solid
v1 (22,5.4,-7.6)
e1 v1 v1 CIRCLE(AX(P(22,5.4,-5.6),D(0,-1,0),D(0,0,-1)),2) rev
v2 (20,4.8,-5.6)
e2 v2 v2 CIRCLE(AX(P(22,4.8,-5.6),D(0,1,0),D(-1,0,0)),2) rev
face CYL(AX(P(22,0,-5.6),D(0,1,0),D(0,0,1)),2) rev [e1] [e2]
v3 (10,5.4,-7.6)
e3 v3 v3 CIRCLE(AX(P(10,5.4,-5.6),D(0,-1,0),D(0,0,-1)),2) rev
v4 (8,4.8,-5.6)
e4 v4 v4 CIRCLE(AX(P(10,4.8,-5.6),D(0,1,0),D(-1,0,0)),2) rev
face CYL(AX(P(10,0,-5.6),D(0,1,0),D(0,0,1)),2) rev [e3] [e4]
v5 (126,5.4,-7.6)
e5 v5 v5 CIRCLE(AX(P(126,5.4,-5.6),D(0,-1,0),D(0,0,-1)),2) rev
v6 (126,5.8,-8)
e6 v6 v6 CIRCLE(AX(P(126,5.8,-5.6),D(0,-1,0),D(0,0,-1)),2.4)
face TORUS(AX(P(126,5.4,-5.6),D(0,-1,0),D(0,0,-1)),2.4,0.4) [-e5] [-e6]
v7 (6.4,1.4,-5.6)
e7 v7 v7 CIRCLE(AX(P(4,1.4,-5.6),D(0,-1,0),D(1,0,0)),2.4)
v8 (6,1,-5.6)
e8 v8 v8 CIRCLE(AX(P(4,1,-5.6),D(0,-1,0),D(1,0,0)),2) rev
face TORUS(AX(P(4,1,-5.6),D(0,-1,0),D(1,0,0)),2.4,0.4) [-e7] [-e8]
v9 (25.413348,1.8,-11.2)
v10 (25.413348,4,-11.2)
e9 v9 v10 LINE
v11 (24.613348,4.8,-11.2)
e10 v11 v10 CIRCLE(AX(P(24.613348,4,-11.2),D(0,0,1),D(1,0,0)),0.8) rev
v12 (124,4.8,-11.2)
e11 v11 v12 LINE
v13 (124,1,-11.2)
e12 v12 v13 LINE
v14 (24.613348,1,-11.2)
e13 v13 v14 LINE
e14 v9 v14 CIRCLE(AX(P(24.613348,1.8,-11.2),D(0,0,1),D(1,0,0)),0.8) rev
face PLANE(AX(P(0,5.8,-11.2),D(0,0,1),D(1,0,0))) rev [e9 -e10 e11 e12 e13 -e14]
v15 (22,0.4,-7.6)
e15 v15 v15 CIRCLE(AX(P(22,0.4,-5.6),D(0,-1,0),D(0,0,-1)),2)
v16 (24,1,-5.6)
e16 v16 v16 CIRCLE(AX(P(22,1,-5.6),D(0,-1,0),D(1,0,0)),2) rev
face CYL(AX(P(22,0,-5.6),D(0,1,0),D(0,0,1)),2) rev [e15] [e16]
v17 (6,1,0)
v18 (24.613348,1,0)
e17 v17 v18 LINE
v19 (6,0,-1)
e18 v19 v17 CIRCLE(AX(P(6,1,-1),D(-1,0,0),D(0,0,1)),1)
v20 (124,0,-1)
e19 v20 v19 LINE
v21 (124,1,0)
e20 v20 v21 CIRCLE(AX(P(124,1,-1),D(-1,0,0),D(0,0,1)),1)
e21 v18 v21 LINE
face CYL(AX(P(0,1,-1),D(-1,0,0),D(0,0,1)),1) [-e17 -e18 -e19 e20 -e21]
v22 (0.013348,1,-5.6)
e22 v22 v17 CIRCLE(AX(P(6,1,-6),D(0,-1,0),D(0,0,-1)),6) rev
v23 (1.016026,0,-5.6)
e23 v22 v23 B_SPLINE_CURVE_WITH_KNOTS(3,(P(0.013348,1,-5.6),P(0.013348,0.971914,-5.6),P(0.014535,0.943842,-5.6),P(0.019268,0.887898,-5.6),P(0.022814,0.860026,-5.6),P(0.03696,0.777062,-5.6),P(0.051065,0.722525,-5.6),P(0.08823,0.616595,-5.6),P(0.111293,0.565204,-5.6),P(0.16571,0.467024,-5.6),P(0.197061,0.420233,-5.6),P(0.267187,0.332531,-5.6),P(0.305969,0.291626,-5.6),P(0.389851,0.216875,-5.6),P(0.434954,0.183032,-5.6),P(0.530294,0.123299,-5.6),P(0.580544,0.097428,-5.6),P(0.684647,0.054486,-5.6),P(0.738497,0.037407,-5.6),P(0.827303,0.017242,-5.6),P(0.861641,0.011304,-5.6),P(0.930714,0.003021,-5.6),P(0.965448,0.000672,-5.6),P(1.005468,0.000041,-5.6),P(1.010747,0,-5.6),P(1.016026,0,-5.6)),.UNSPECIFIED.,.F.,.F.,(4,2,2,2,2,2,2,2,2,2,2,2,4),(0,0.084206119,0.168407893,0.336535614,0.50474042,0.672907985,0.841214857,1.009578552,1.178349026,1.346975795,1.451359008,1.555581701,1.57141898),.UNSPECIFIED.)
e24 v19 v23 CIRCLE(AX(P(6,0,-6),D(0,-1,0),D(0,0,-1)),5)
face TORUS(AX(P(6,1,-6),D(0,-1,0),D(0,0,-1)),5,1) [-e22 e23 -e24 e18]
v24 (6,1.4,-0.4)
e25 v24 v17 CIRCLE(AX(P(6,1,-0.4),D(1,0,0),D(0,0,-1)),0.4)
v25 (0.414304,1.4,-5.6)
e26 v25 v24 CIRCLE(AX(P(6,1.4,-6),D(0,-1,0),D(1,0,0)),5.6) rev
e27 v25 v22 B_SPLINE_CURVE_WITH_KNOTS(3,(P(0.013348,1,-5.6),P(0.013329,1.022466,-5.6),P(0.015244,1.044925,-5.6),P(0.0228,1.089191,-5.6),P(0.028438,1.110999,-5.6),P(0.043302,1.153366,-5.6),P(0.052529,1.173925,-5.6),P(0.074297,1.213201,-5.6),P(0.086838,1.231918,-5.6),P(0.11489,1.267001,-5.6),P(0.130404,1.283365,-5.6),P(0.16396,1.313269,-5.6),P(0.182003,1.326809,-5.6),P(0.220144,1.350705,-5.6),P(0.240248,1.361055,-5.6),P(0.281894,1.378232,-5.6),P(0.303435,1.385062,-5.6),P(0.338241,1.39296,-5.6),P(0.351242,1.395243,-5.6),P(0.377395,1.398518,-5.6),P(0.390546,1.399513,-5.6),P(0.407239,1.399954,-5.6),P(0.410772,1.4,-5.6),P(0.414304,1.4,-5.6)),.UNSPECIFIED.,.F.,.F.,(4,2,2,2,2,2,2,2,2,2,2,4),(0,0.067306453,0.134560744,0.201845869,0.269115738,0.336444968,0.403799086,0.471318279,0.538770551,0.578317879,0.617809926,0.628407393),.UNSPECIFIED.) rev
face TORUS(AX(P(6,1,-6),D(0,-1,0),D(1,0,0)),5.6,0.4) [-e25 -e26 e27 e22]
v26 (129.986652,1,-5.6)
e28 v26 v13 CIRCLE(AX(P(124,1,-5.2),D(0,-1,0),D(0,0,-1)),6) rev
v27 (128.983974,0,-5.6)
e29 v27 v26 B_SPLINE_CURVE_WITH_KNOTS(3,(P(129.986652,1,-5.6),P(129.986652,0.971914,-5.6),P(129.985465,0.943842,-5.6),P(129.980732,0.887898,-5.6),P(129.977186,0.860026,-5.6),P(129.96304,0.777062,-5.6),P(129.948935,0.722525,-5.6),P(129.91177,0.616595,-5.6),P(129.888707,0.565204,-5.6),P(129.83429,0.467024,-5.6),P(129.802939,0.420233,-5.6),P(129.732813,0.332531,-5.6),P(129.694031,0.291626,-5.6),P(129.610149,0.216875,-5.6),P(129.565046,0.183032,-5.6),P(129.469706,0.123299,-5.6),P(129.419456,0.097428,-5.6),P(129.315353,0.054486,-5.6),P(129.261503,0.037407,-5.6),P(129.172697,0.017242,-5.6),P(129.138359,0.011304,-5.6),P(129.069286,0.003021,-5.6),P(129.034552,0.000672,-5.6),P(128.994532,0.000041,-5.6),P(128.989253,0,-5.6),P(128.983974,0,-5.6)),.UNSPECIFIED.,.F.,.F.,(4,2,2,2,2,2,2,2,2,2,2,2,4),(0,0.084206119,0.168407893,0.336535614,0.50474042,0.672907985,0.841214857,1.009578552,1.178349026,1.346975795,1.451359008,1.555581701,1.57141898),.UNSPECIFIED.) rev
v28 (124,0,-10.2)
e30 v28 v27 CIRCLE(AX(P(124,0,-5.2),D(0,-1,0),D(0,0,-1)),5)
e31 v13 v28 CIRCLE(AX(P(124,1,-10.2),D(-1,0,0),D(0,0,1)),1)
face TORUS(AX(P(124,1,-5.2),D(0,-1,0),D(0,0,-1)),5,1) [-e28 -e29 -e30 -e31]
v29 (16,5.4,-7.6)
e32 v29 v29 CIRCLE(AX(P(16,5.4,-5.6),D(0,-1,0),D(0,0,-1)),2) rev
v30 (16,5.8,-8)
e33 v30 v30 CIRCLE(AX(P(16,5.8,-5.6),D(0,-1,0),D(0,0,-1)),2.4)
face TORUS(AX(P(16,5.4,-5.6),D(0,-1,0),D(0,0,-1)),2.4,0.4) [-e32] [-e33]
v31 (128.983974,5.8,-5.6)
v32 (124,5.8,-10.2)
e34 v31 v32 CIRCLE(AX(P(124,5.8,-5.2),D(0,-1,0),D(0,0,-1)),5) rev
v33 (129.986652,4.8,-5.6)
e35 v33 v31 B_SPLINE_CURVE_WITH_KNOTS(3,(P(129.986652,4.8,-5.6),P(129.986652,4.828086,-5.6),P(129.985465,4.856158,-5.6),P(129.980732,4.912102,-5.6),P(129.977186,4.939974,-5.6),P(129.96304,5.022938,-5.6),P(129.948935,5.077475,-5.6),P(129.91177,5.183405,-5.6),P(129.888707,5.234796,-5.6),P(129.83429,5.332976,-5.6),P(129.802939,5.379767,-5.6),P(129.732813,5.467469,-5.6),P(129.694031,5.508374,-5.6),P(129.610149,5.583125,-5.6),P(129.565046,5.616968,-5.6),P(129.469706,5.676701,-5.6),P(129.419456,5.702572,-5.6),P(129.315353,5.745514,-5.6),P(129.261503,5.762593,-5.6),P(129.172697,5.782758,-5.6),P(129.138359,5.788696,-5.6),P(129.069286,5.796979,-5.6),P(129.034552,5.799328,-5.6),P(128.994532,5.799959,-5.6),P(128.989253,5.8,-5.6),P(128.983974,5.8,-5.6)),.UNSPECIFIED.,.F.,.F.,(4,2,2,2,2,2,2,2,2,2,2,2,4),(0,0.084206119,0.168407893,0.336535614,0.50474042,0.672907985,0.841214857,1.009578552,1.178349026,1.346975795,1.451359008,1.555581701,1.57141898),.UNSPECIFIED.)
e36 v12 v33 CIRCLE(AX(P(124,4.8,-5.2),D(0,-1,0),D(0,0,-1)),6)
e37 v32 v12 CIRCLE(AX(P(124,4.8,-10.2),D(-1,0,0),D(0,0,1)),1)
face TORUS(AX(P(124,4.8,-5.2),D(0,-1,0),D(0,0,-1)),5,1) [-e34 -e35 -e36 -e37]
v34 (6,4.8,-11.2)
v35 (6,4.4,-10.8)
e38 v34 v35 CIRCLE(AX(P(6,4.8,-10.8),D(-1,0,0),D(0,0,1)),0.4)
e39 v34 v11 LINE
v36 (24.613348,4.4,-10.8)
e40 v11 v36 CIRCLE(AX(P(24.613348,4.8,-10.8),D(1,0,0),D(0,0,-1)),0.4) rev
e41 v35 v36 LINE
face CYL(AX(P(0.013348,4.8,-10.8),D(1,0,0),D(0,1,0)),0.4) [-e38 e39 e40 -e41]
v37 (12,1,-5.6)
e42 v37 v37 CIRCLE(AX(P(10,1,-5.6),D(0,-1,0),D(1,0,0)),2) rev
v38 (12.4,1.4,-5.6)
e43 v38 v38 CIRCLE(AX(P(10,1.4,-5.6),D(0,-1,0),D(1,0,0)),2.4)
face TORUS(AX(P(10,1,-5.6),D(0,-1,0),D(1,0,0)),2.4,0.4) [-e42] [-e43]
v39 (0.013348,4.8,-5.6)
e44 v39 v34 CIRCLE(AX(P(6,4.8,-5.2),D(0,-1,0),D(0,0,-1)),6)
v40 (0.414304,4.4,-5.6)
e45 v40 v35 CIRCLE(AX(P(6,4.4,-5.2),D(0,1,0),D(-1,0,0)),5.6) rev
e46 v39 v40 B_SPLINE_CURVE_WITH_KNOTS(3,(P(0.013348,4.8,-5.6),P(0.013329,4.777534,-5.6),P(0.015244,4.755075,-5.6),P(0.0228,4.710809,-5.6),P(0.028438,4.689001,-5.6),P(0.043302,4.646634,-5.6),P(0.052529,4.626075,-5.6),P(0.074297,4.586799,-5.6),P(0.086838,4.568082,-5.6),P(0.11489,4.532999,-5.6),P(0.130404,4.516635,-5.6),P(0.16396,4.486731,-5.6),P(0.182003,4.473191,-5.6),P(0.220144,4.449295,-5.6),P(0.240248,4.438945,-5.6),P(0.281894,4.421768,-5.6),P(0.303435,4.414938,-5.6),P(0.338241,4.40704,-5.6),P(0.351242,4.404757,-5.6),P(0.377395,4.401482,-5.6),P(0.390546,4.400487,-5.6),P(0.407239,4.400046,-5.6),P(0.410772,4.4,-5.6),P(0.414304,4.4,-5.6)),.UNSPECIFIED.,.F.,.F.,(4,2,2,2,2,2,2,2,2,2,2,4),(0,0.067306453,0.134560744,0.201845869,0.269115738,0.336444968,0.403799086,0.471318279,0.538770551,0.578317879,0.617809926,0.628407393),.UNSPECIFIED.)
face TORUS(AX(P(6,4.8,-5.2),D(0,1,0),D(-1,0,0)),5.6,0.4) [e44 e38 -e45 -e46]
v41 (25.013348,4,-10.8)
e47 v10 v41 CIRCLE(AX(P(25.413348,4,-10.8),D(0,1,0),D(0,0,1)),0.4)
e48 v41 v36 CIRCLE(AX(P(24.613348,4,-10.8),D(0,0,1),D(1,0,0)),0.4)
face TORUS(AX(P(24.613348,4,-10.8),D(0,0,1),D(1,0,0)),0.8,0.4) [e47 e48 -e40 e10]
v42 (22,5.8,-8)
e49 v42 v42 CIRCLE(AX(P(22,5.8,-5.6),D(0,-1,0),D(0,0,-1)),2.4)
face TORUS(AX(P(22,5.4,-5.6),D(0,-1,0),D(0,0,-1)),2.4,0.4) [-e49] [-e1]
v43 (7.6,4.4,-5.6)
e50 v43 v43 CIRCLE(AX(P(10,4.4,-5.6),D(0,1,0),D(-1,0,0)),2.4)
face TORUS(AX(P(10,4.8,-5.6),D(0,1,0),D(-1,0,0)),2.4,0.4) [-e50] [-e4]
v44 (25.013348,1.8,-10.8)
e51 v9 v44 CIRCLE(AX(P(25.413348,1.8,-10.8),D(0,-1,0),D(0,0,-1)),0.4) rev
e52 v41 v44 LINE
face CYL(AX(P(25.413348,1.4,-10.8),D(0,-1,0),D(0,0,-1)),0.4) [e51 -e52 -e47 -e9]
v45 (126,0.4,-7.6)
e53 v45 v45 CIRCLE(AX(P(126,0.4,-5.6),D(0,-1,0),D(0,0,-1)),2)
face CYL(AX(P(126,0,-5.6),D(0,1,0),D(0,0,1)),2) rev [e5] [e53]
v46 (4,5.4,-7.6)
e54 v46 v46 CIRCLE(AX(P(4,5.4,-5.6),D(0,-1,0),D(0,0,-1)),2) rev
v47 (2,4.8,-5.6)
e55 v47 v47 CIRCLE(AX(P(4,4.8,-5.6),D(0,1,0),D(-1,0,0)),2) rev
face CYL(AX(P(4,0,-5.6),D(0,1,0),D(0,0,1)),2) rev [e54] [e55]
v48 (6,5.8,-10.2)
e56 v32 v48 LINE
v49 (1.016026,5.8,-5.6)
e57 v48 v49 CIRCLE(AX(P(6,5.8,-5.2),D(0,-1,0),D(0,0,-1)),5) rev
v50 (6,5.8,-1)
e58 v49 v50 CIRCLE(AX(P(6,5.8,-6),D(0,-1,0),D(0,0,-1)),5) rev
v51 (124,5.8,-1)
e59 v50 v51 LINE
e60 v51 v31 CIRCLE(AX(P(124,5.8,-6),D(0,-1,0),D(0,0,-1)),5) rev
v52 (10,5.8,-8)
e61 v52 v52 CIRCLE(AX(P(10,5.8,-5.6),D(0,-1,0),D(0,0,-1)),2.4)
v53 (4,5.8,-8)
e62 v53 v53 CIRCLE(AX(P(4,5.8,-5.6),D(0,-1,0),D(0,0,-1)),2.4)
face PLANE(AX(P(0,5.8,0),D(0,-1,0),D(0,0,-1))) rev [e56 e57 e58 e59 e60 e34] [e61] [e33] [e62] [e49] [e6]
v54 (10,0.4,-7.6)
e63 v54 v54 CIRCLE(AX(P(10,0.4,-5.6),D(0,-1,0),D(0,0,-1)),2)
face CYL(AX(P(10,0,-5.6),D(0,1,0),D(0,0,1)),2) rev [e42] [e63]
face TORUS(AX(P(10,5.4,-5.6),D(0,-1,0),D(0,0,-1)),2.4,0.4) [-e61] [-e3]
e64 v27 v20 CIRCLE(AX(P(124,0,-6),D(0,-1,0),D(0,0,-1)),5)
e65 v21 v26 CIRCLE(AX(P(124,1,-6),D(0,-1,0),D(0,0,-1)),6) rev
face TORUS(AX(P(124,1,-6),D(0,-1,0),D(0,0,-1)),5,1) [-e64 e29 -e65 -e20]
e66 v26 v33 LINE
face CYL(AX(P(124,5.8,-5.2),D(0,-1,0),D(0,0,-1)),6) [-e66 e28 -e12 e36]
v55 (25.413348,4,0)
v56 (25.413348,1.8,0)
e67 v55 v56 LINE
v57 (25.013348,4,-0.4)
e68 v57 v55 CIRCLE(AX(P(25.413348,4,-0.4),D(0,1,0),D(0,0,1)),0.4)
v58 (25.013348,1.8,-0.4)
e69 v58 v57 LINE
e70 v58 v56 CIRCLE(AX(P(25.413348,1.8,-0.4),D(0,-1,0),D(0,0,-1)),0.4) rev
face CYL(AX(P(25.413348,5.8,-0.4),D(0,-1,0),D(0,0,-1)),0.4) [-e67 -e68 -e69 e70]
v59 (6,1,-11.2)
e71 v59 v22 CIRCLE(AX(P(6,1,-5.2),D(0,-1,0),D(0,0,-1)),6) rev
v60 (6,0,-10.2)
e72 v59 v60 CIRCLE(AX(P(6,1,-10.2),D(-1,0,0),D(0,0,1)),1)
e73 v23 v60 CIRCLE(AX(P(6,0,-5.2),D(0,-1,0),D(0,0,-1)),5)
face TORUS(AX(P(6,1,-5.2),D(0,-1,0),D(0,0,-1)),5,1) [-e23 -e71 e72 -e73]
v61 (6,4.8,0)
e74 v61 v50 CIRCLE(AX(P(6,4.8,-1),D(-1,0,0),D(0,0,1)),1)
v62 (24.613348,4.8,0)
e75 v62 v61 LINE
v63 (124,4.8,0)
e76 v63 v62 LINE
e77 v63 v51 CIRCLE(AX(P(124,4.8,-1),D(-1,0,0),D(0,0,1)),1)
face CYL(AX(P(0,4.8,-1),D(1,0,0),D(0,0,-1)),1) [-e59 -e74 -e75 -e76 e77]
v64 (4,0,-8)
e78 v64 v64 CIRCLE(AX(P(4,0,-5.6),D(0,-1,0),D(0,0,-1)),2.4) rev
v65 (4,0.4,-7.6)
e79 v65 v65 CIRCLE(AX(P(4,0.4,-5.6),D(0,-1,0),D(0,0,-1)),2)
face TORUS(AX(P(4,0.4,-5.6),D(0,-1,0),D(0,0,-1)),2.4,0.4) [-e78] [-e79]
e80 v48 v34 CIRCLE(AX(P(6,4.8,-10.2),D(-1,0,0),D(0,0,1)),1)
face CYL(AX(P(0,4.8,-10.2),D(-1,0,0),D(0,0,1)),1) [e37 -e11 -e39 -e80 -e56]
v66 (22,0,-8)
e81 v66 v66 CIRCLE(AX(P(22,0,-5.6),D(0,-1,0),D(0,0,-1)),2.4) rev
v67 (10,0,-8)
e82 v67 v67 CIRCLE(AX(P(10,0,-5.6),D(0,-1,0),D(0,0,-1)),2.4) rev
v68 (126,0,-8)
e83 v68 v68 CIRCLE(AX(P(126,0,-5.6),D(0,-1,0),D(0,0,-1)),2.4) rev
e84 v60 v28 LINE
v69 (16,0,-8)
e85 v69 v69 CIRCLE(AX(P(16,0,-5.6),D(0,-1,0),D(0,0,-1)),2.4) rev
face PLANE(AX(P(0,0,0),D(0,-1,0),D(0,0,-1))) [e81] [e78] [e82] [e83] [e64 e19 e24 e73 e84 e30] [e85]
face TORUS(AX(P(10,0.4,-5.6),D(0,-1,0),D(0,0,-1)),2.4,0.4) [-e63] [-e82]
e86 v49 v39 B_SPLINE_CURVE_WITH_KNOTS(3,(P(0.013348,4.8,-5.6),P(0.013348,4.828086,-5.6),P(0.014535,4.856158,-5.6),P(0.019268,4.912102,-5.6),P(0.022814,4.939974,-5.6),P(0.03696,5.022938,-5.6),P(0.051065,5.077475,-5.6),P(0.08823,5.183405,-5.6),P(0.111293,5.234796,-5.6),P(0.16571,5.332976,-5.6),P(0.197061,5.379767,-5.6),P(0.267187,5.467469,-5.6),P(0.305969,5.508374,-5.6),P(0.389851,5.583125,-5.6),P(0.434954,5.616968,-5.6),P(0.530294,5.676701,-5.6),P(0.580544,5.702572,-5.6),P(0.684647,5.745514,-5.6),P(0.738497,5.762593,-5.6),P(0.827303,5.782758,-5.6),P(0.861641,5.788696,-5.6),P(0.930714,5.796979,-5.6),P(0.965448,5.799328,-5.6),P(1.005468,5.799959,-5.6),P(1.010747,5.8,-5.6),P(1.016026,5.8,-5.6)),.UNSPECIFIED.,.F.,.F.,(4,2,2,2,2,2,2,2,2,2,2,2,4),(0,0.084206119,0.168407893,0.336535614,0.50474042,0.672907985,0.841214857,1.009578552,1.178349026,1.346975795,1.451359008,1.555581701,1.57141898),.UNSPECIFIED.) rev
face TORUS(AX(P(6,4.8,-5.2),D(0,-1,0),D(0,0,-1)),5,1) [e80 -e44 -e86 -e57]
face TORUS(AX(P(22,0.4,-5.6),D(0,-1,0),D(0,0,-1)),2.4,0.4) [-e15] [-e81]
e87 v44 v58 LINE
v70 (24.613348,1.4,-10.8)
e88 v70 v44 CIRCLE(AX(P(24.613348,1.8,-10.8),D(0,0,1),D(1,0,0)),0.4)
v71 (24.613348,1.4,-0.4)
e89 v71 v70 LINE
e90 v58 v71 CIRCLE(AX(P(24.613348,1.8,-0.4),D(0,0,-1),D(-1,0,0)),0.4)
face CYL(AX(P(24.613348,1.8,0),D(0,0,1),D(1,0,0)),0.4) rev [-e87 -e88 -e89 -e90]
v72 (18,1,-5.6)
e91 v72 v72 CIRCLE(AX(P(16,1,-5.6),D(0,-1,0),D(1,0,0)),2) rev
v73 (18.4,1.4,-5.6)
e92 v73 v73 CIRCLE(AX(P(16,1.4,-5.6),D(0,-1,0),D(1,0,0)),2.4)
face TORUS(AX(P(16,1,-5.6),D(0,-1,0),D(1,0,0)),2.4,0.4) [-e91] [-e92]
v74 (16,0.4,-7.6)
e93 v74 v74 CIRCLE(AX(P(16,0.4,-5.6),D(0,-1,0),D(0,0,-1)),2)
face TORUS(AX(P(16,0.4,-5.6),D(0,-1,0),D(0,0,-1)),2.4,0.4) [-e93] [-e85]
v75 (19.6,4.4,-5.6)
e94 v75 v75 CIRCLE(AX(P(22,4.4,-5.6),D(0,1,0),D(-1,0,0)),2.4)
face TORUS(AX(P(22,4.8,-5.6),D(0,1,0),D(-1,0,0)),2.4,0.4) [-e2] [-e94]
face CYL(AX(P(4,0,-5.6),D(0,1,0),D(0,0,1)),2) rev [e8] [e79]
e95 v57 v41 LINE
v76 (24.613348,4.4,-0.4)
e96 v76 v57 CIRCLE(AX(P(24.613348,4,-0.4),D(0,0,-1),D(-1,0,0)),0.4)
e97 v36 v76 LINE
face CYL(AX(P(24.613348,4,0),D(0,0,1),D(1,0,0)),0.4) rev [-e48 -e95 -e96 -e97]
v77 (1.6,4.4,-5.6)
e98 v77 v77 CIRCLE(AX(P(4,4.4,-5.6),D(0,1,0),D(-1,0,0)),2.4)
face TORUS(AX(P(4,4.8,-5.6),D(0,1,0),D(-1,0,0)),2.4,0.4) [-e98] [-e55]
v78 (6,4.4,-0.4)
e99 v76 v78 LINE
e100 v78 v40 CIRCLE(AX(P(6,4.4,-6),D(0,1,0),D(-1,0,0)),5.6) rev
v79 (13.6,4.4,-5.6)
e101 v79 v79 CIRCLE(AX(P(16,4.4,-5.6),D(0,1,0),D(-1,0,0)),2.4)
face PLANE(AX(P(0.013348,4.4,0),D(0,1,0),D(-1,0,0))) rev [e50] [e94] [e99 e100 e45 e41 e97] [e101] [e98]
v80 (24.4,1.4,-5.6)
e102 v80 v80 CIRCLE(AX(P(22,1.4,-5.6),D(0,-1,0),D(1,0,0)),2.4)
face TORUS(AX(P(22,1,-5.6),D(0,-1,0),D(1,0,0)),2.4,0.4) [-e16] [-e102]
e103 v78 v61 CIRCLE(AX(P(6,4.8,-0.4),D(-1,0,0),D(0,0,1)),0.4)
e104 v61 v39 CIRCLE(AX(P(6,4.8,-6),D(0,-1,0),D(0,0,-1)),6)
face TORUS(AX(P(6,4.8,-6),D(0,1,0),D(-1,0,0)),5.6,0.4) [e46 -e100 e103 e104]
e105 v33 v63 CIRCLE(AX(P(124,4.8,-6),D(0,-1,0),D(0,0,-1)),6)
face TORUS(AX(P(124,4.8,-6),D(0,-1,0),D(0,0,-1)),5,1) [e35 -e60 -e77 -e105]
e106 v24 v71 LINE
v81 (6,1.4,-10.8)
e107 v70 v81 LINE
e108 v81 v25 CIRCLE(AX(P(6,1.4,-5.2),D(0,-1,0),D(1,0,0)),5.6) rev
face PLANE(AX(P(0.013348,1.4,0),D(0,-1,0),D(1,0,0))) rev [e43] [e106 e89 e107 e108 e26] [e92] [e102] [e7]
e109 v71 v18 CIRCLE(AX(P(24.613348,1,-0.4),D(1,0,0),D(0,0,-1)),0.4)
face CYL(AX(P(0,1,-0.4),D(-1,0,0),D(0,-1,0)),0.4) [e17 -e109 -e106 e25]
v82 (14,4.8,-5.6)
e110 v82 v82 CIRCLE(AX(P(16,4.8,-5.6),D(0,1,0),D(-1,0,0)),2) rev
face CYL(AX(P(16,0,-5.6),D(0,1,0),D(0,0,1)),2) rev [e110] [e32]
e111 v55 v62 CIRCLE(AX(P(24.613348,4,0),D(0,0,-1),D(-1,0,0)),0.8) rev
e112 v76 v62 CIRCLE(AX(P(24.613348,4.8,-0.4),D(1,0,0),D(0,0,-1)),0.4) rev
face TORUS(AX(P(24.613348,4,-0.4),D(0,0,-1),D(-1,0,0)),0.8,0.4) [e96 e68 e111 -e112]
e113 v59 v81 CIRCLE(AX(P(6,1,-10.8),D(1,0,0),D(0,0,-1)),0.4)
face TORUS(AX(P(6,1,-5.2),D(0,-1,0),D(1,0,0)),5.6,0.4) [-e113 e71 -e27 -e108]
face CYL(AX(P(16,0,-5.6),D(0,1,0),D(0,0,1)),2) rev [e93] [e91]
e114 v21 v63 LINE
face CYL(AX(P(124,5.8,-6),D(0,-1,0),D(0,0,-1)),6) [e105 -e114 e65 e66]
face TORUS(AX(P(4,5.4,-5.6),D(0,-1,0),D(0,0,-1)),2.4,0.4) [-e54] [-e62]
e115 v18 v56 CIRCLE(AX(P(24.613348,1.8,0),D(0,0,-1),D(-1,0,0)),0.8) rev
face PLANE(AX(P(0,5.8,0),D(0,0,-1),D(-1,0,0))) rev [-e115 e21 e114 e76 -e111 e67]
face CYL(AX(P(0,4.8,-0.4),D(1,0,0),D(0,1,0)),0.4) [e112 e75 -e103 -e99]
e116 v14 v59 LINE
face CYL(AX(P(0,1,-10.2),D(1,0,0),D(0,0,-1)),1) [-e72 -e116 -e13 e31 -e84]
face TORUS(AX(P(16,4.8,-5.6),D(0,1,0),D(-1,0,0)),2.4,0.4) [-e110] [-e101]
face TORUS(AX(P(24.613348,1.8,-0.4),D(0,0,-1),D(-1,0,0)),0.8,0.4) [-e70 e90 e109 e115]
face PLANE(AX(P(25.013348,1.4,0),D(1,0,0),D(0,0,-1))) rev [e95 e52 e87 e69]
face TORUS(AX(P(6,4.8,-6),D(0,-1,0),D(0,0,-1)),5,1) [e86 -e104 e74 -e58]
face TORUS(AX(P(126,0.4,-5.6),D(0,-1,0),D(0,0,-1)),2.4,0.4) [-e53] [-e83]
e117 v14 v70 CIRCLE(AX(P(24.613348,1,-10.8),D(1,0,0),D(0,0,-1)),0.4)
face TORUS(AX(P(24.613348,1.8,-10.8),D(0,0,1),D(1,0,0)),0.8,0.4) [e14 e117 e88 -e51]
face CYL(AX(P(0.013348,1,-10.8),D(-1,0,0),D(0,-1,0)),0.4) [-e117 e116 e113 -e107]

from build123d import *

# Parameters (mm, degrees)
SKETCH1_W           = 130
SKETCH1_H           = 11.2
BOSS_EXTRUDE1_DEPTH = 5.8
SKETCH2_R           = 2
CUT_EXTRUDE1_DEPTH  = 131.610413061
FILLET1_R           = 6
FILLET2_R           = 1
SKETCH3_W           = 25
SKETCH3_H           = 3
CUT_EXTRUDE2_DEPTH  = 131.597127382
FILLET3_R           = 0.4


with BuildPart() as part:
    # Sketch1 → Boss-Extrude1 (new body)
    with BuildSketch(Plane(origin=(0, 0, 0), x_dir=(1, 0, 0), z_dir=(0, 1, 0))):
        with Locations((65, 5.6)):
            Rectangle(SKETCH1_W, SKETCH1_H)
    extrude(amount=BOSS_EXTRUDE1_DEPTH)

    # Sketch2 → Cut-Extrude1 (cut, through all)
    with BuildSketch(Plane(origin=(0, 5.8, 0), x_dir=(1, 0, 0), z_dir=(0, 1, 0))):
        with Locations(Location((4, 5.6, 0), (0, 0, 270))):
            Circle(SKETCH2_R)
        with Locations(Location((126, 5.6, 0), (0, 0, 270))):
            Circle(SKETCH2_R)
        with Locations(Location((10, 5.6, 0), (0, 0, 270))):
            Circle(SKETCH2_R)
        with Locations(Location((16, 5.6, 0), (0, 0, 270))):
            Circle(SKETCH2_R)
        with Locations(Location((22, 5.6, 0), (0, 0, 270))):
            Circle(SKETCH2_R)
    extrude(amount=-CUT_EXTRUDE1_DEPTH, mode=Mode.SUBTRACT)

    # Fillet1
    # the kernel refuses this fillet: 6 mm, written as the material it takes off along each edge
    with BuildSketch(Plane(origin=(130, -15, 0), x_dir=(-1, 0, 0), z_dir=(0, 1, 0)), Plane(origin=(130, -15, -11.2), x_dir=(0, 0, 1), z_dir=(0, 1, 0))) as fillet1_piece_1:
        with BuildLine():
            CenterArc((FILLET1_R, -FILLET1_R), FILLET1_R, 90, 90)
            Line((0, -FILLET1_R), (0, 0))
            Line((0, 0), (FILLET1_R, 0))
        make_face()
    extrude(amount=35.8, mode=Mode.SUBTRACT)
    with BuildSketch(Plane(origin=(0, -15, -11.2), x_dir=(0, 0, 1), z_dir=(0, 1, 0)), Plane(origin=(0, -15, 0), x_dir=(1, 0, 0), z_dir=(0, 1, 0))) as fillet1_piece_2:
        with BuildLine():
            CenterArc((FILLET1_R, FILLET1_R), FILLET1_R, 180, 90)
            Line((0, FILLET1_R), (0, 0))
            Line((0, 0), (FILLET1_R, 0))
        make_face()
    extrude(amount=35.8, mode=Mode.SUBTRACT)

    # Fillet2
    # the kernel refuses this fillet: 1 mm, written as the material it takes off along each edge
    with BuildSketch(Plane(origin=(124, 0, -11.2), x_dir=(0, 0, 1), z_dir=(-1, 0, 0)), Plane(origin=(6, 5.8, 0), x_dir=(0, -1, 0), z_dir=(1, 0, 0))) as fillet2_piece_1:
        with BuildLine():
            CenterArc((FILLET2_R, FILLET2_R), FILLET2_R, 180, 90)
            Line((0, FILLET2_R), (0, 0))
            Line((0, 0), (FILLET2_R, 0))
        make_face()
    extrude(amount=118, mode=Mode.SUBTRACT)
    with BuildSketch(Plane(origin=(6, 0, 0), x_dir=(0, 1, 0), z_dir=(1, 0, 0)), Plane(origin=(124, 5.8, -11.2), x_dir=(0, 0, 1), z_dir=(-1, 0, 0))) as fillet2_piece_2:
        with BuildLine():
            CenterArc((FILLET2_R, -FILLET2_R), FILLET2_R, 90, 90)
            Line((0, -FILLET2_R), (0, 0))
            Line((0, 0), (FILLET2_R, 0))
        make_face()
    extrude(amount=118, mode=Mode.SUBTRACT)
    with BuildSketch(Plane(origin=(124, 0, -5.2), x_dir=(0, 0, -1), z_dir=(-1, 0, 0))) as fillet2_piece_3:
        with BuildLine():
            CenterArc((6 - FILLET2_R, -FILLET2_R), FILLET2_R, 0, 90)
            Line((6, -FILLET2_R), (6, 0))
            Line((6, 0), (6 - FILLET2_R, 0))
        make_face()
    revolve(axis=Axis((124, 0, -5.2), (0, -1, 0)), revolution_arc=110.05948027, mode=Mode.SUBTRACT)
    with BuildSketch(Plane(origin=(124, 0, -6), x_dir=(0.9393370543039211, 0, -0.3429954787043592), z_dir=(-0.3429954787043592, 0, -0.9393370543039211))) as fillet2_piece_4:
        with BuildLine():
            CenterArc((6 - FILLET2_R, -FILLET2_R), FILLET2_R, 0, 90)
            Line((6, -FILLET2_R), (6, 0))
            Line((6, 0), (6 - FILLET2_R, 0))
        make_face()
    revolve(axis=Axis((124, 0, -6), (0, -1, 0)), revolution_arc=110.05948027, mode=Mode.SUBTRACT)
    with BuildSketch(Plane(origin=(6, 0, -6), x_dir=(0, 0, 1), z_dir=(1, 0, 0))) as fillet2_piece_5:
        with BuildLine():
            CenterArc((6 - FILLET2_R, -FILLET2_R), FILLET2_R, 0, 90)
            Line((6, -FILLET2_R), (6, 0))
            Line((6, 0), (6 - FILLET2_R, 0))
        make_face()
    revolve(axis=Axis((6, 0, -6), (0, -1, 0)), revolution_arc=110.05948027, mode=Mode.SUBTRACT)
    with BuildSketch(Plane(origin=(6, 0, -5.2), x_dir=(-0.9393370543039198, 0, 0.3429954787043625), z_dir=(0.3429954787043625, 0, 0.9393370543039198))) as fillet2_piece_6:
        with BuildLine():
            CenterArc((6 - FILLET2_R, -FILLET2_R), FILLET2_R, 0, 90)
            Line((6, -FILLET2_R), (6, 0))
            Line((6, 0), (6 - FILLET2_R, 0))
        make_face()
    revolve(axis=Axis((6, 0, -5.2), (0, -1, 0)), revolution_arc=110.05948027, mode=Mode.SUBTRACT)
    with BuildSketch(Plane(origin=(124, 5.8, -5.2), x_dir=(0, 0, -1), z_dir=(-1, 0, 0))) as fillet2_piece_7:
        with BuildLine():
            CenterArc((6 - FILLET2_R, FILLET2_R), FILLET2_R, 270, 90)
            Line((6, FILLET2_R), (6, 0))
            Line((6, 0), (6 - FILLET2_R, 0))
        make_face()
    revolve(axis=Axis((124, 5.8, -5.2), (0, -1, 0)), revolution_arc=110.05948027, mode=Mode.SUBTRACT)
    with BuildSketch(Plane(origin=(124, 5.8, -6), x_dir=(0.9393370543039211, 0, -0.3429954787043592), z_dir=(-0.3429954787043592, 0, -0.9393370543039211))) as fillet2_piece_8:
        with BuildLine():
            CenterArc((6 - FILLET2_R, FILLET2_R), FILLET2_R, 270, 90)
            Line((6 - FILLET2_R, 0), (6, 0))
            Line((6, 0), (6, FILLET2_R))
        make_face()
    revolve(axis=Axis((124, 5.8, -6), (0, -1, 0)), revolution_arc=110.05948027, mode=Mode.SUBTRACT)
    with BuildSketch(Plane(origin=(6, 5.8, -6), x_dir=(0, 0, 1), z_dir=(1, 0, 0))) as fillet2_piece_9:
        with BuildLine():
            CenterArc((6 - FILLET2_R, FILLET2_R), FILLET2_R, 270, 90)
            Line((6, FILLET2_R), (6, 0))
            Line((6, 0), (6 - FILLET2_R, 0))
        make_face()
    revolve(axis=Axis((6, 5.8, -6), (0, -1, 0)), revolution_arc=110.05948027, mode=Mode.SUBTRACT)
    with BuildSketch(Plane(origin=(6, 5.8, -5.2), x_dir=(-0.9393370543039198, 0, 0.3429954787043625), z_dir=(0.3429954787043625, 0, 0.9393370543039198))) as fillet2_piece_10:
        with BuildLine():
            CenterArc((6 - FILLET2_R, FILLET2_R), FILLET2_R, 270, 90)
            Line((6, FILLET2_R), (6, 0))
            Line((6, 0), (6 - FILLET2_R, 0))
        make_face()
    revolve(axis=Axis((6, 5.8, -5.2), (0, -1, 0)), revolution_arc=110.05948027, mode=Mode.SUBTRACT)

    # Sketch3 → Cut-Extrude2 (cut, through all)
    with BuildSketch(Plane(origin=(0, 0, -11.2), x_dir=(-1, 0, 0), z_dir=(0, 0, -1))):
        with Locations((-12.513348181, 2.9)):
            Rectangle(SKETCH3_W, SKETCH3_H)
    extrude(amount=-CUT_EXTRUDE2_DEPTH, mode=Mode.SUBTRACT)

    # Fillet3
    # the kernel refuses this fillet: 0.4 mm, written as the material it adds along each edge
    with BuildSketch(Plane(origin=(25.013348181, 4.4, -11.2), x_dir=(-1, 0, 0), z_dir=(0, 0, 1)), Plane(origin=(25.013348181, 1.4, -11.2), x_dir=(0, 1, 0), z_dir=(0, 0, 1))) as fillet3_piece_1:
        with BuildLine():
            CenterArc((FILLET3_R, FILLET3_R), FILLET3_R, 180, 90)
            Line((0, FILLET3_R), (0, 0))
            Line((0, 0), (FILLET3_R, 0))
        make_face()
    extrude(amount=11.2)
    # the kernel refuses this fillet: 0.4 mm, written as the material it takes off along each edge
    with BuildSketch(Plane(origin=(126, 5.8, -5.6), x_dir=(0, 0, 1), z_dir=(-1, 0, 0))) as fillet3_2_piece_1:
        with BuildLine():
            CenterArc((2 + FILLET3_R, -FILLET3_R), FILLET3_R, 90, 90)
            Line((2, -FILLET3_R), (2, 0))
            Line((2, 0), (2 + FILLET3_R, 0))
        make_face()
    revolve(axis=Axis((126, 5.8, -5.6), (0, 1, 0)), mode=Mode.SUBTRACT)
    with BuildSketch(Plane(origin=(126, 0, -5.6), x_dir=(0, 0, 1), z_dir=(-1, 0, 0))) as fillet3_2_piece_2:
        with BuildLine():
            CenterArc((2 + FILLET3_R, FILLET3_R), FILLET3_R, 180, 90)
            Line((2, FILLET3_R), (2, 0))
            Line((2, 0), (2 + FILLET3_R, 0))
        make_face()
    revolve(axis=Axis((126, 0, -5.6), (0, 1, 0)), mode=Mode.SUBTRACT)
    with BuildSketch(Plane(origin=(4, 5.8, -5.6), x_dir=(0, 0, 1), z_dir=(-1, 0, 0))) as fillet3_2_piece_3:
        with BuildLine():
            CenterArc((2 + FILLET3_R, -FILLET3_R), FILLET3_R, 90, 90)
            Line((2, -FILLET3_R), (2, 0))
            Line((2, 0), (2 + FILLET3_R, 0))
        make_face()
    revolve(axis=Axis((4, 5.8, -5.6), (0, 1, 0)), mode=Mode.SUBTRACT)
    with BuildSketch(Plane(origin=(4, 4.4, -5.6), x_dir=(0, 0, 1), z_dir=(-1, 0, 0))) as fillet3_2_piece_4:
        with BuildLine():
            CenterArc((2 + FILLET3_R, FILLET3_R), FILLET3_R, 180, 90)
            Line((2, FILLET3_R), (2, 0))
            Line((2, 0), (2 + FILLET3_R, 0))
        make_face()
    revolve(axis=Axis((4, 4.4, -5.6), (0, 1, 0)), mode=Mode.SUBTRACT)
    with BuildSketch(Plane(origin=(4, 0, -5.6), x_dir=(0, 0, 1), z_dir=(-1, 0, 0))) as fillet3_2_piece_5:
        with BuildLine():
            CenterArc((2 + FILLET3_R, FILLET3_R), FILLET3_R, 180, 90)
            Line((2, FILLET3_R), (2, 0))
            Line((2, 0), (2 + FILLET3_R, 0))
        make_face()
    revolve(axis=Axis((4, 0, -5.6), (0, 1, 0)), mode=Mode.SUBTRACT)
    with BuildSketch(Plane(origin=(4, 1.4, -5.6), x_dir=(0, 0, 1), z_dir=(-1, 0, 0))) as fillet3_2_piece_6:
        with BuildLine():
            CenterArc((2 + FILLET3_R, -FILLET3_R), FILLET3_R, 90, 90)
            Line((2, -FILLET3_R), (2, 0))
            Line((2, 0), (2 + FILLET3_R, 0))
        make_face()
    revolve(axis=Axis((4, 1.4, -5.6), (0, 1, 0)), mode=Mode.SUBTRACT)
    with BuildSketch(Plane(origin=(22, 0, -5.6), x_dir=(0, 0, 1), z_dir=(-1, 0, 0))) as fillet3_2_piece_7:
        with BuildLine():
            CenterArc((2 + FILLET3_R, FILLET3_R), FILLET3_R, 180, 90)
            Line((2, FILLET3_R), (2, 0))
            Line((2, 0), (2 + FILLET3_R, 0))
        make_face()
    revolve(axis=Axis((22, 0, -5.6), (0, 1, 0)), mode=Mode.SUBTRACT)
    with BuildSketch(Plane(origin=(22, 1.4, -5.6), x_dir=(0, 0, 1), z_dir=(-1, 0, 0))) as fillet3_2_piece_8:
        with BuildLine():
            CenterArc((2 + FILLET3_R, -FILLET3_R), FILLET3_R, 90, 90)
            Line((2, -FILLET3_R), (2, 0))
            Line((2, 0), (2 + FILLET3_R, 0))
        make_face()
    revolve(axis=Axis((22, 1.4, -5.6), (0, 1, 0)), mode=Mode.SUBTRACT)
    with BuildSketch(Plane(origin=(22, 5.8, -5.6), x_dir=(0, 0, 1), z_dir=(-1, 0, 0))) as fillet3_2_piece_9:
        with BuildLine():
            CenterArc((2 + FILLET3_R, -FILLET3_R), FILLET3_R, 90, 90)
            Line((2, -FILLET3_R), (2, 0))
            Line((2, 0), (2 + FILLET3_R, 0))
        make_face()
    revolve(axis=Axis((22, 5.8, -5.6), (0, 1, 0)), mode=Mode.SUBTRACT)
    with BuildSketch(Plane(origin=(22, 4.4, -5.6), x_dir=(0, 0, 1), z_dir=(-1, 0, 0))) as fillet3_2_piece_10:
        with BuildLine():
            CenterArc((2 + FILLET3_R, FILLET3_R), FILLET3_R, 180, 90)
            Line((2, FILLET3_R), (2, 0))
            Line((2, 0), (2 + FILLET3_R, 0))
        make_face()
    revolve(axis=Axis((22, 4.4, -5.6), (0, 1, 0)), mode=Mode.SUBTRACT)
    with BuildSketch(Plane(origin=(16, 0, -5.6), x_dir=(0, 0, 1), z_dir=(-1, 0, 0))) as fillet3_2_piece_11:
        with BuildLine():
            CenterArc((2 + FILLET3_R, FILLET3_R), FILLET3_R, 180, 90)
            Line((2, FILLET3_R), (2, 0))
            Line((2, 0), (2 + FILLET3_R, 0))
        make_face()
    revolve(axis=Axis((16, 0, -5.6), (0, 1, 0)), mode=Mode.SUBTRACT)
    with BuildSketch(Plane(origin=(16, 1.4, -5.6), x_dir=(0, 0, 1), z_dir=(-1, 0, 0))) as fillet3_2_piece_12:
        with BuildLine():
            CenterArc((2 + FILLET3_R, -FILLET3_R), FILLET3_R, 90, 90)
            Line((2, -FILLET3_R), (2, 0))
            Line((2, 0), (2 + FILLET3_R, 0))
        make_face()
    revolve(axis=Axis((16, 1.4, -5.6), (0, 1, 0)), mode=Mode.SUBTRACT)
    with BuildSketch(Plane(origin=(16, 5.8, -5.6), x_dir=(0, 0, 1), z_dir=(-1, 0, 0))) as fillet3_2_piece_13:
        with BuildLine():
            CenterArc((2 + FILLET3_R, -FILLET3_R), FILLET3_R, 90, 90)
            Line((2, -FILLET3_R), (2, 0))
            Line((2, 0), (2 + FILLET3_R, 0))
        make_face()
    revolve(axis=Axis((16, 5.8, -5.6), (0, 1, 0)), mode=Mode.SUBTRACT)
    with BuildSketch(Plane(origin=(16, 4.4, -5.6), x_dir=(0, 0, 1), z_dir=(-1, 0, 0))) as fillet3_2_piece_14:
        with BuildLine():
            CenterArc((2 + FILLET3_R, FILLET3_R), FILLET3_R, 180, 90)
            Line((2, FILLET3_R), (2, 0))
            Line((2, 0), (2 + FILLET3_R, 0))
        make_face()
    revolve(axis=Axis((16, 4.4, -5.6), (0, 1, 0)), mode=Mode.SUBTRACT)
    with BuildSketch(Plane(origin=(10, 0, -5.6), x_dir=(0, 0, 1), z_dir=(-1, 0, 0))) as fillet3_2_piece_15:
        with BuildLine():
            CenterArc((2 + FILLET3_R, FILLET3_R), FILLET3_R, 180, 90)
            Line((2, FILLET3_R), (2, 0))
            Line((2, 0), (2 + FILLET3_R, 0))
        make_face()
    revolve(axis=Axis((10, 0, -5.6), (0, 1, 0)), mode=Mode.SUBTRACT)
    with BuildSketch(Plane(origin=(10, 1.4, -5.6), x_dir=(0, 0, 1), z_dir=(-1, 0, 0))) as fillet3_2_piece_16:
        with BuildLine():
            CenterArc((2 + FILLET3_R, -FILLET3_R), FILLET3_R, 90, 90)
            Line((2, -FILLET3_R), (2, 0))
            Line((2, 0), (2 + FILLET3_R, 0))
        make_face()
    revolve(axis=Axis((10, 1.4, -5.6), (0, 1, 0)), mode=Mode.SUBTRACT)
    with BuildSketch(Plane(origin=(10, 5.8, -5.6), x_dir=(0, 0, 1), z_dir=(-1, 0, 0))) as fillet3_2_piece_17:
        with BuildLine():
            CenterArc((2 + FILLET3_R, -FILLET3_R), FILLET3_R, 90, 90)
            Line((2, -FILLET3_R), (2, 0))
            Line((2, 0), (2 + FILLET3_R, 0))
        make_face()
    revolve(axis=Axis((10, 5.8, -5.6), (0, 1, 0)), mode=Mode.SUBTRACT)
    with BuildSketch(Plane(origin=(10, 4.4, -5.6), x_dir=(0, 0, 1), z_dir=(-1, 0, 0))) as fillet3_2_piece_18:
        with BuildLine():
            CenterArc((2 + FILLET3_R, FILLET3_R), FILLET3_R, 180, 90)
            Line((2, FILLET3_R), (2, 0))
            Line((2, 0), (2 + FILLET3_R, 0))
        make_face()
    revolve(axis=Axis((10, 4.4, -5.6), (0, 1, 0)), mode=Mode.SUBTRACT)
    # the kernel refuses this fillet: 0.4 mm, written as the material it takes off along each edge
    with BuildSketch(Plane(origin=(6, 4.4, -6), x_dir=(0, 0, 1), z_dir=(1, 0, 0))) as fillet3_3_piece_1:
        with BuildLine():
            CenterArc((6 - FILLET3_R, -FILLET3_R), FILLET3_R, 0, 90)
            Line((6, -FILLET3_R), (6, 0))
            Line((6, 0), (6 - FILLET3_R, 0))
        make_face()
    revolve(axis=Axis((6, 4.4, -6), (0, -1, 0)), revolution_arc=95.73025987, mode=Mode.SUBTRACT)
    with BuildSketch(Plane(origin=(6, 4.4, -5.2), x_dir=(-0.9950029770170926, 0, 0.09984525891159218), z_dir=(0.09984525891159218, 0, 0.9950029770170926))) as fillet3_3_piece_2:
        with BuildLine():
            CenterArc((6 - FILLET3_R, -FILLET3_R), FILLET3_R, 360, 90)
            Line((6, -FILLET3_R), (6, 0))
            Line((6, 0), (6 - FILLET3_R, 0))
        make_face()
    revolve(axis=Axis((6, 4.4, -5.2), (0, -1, 0)), revolution_arc=95.73025987, mode=Mode.SUBTRACT)
    with BuildSketch(Plane(origin=(6, 1.4, -6), x_dir=(0, 0, 1), z_dir=(1, 0, 0))) as fillet3_3_piece_3:
        with BuildLine():
            CenterArc((6 - FILLET3_R, FILLET3_R), FILLET3_R, 270, 90)
            Line((6 - FILLET3_R, 0), (6, 0))
            Line((6, 0), (6, FILLET3_R))
        make_face()
    revolve(axis=Axis((6, 1.4, -6), (0, -1, 0)), revolution_arc=95.73025987, mode=Mode.SUBTRACT)
    with BuildSketch(Plane(origin=(6, 1.4, -5.2), x_dir=(-0.9950029770170926, 0, 0.0998452589115928), z_dir=(0.0998452589115928, 0, 0.9950029770170926))) as fillet3_3_piece_4:
        with BuildLine():
            CenterArc((6 - FILLET3_R, FILLET3_R), FILLET3_R, 270, 90)
            Line((6, FILLET3_R), (6, 0))
            Line((6, 0), (6 - FILLET3_R, 0))
        make_face()
    revolve(axis=Axis((6, 1.4, -5.2), (0, -1, 0)), revolution_arc=95.73025987, mode=Mode.SUBTRACT)
    with BuildSketch(Plane(origin=(24.613348181, 4.4, 0), x_dir=(0, 1, 0), z_dir=(-1, 0, 0)), Plane(origin=(24.613348181, 4.4, -11.2), x_dir=(0, 0, 1), z_dir=(-1, 0, 0)), Plane(origin=(6, 1.4, 0), x_dir=(0, -1, 0), z_dir=(1, 0, 0)), Plane(origin=(6, 1.4, -11.2), x_dir=(0, 0, 1), z_dir=(1, 0, 0))) as fillet3_3_piece_5:
        with BuildLine():
            CenterArc((FILLET3_R, FILLET3_R), FILLET3_R, 180, 90)
            Line((0, FILLET3_R), (0, 0))
            Line((0, 0), (FILLET3_R, 0))
        make_face()
    extrude(amount=18.613348181, mode=Mode.SUBTRACT)
    with BuildSketch(Plane(origin=(25.013348181, 1.8, 0), x_dir=(1, 0, 0), z_dir=(0, 1, 0)), Plane(origin=(25.013348181, 1.8, -11.2), x_dir=(0, 0, 1), z_dir=(0, 1, 0))) as fillet3_3_piece_6:
        with BuildLine():
            CenterArc((FILLET3_R, FILLET3_R), FILLET3_R, 180, 90)
            Line((0, FILLET3_R), (0, 0))
            Line((0, 0), (FILLET3_R, 0))
        make_face()
    extrude(amount=2.2, mode=Mode.SUBTRACT)
    with BuildSketch(Plane(origin=(24.613348181, 1.8, -11.2), x_dir=(1, 0, 0), z_dir=(0, 1, 0))) as fillet3_3_piece_7:
        with BuildLine():
            CenterArc((0.4 + FILLET3_R, -FILLET3_R), FILLET3_R, 90, 90)
            Line((0.4 + FILLET3_R, 0), (0.4, 0))
            Line((0.4, 0), (0.4, -FILLET3_R))
        make_face()
    revolve(axis=Axis((24.613348181, 1.8, -11.2), (0, 0, -1)), revolution_arc=90, mode=Mode.SUBTRACT)
    with BuildSketch(Plane(origin=(24.613348181, 4, -11.2), x_dir=(0, 1, 0), z_dir=(-1, 0, 0))) as fillet3_3_piece_8:
        with BuildLine():
            CenterArc((0.4 + FILLET3_R, -FILLET3_R), FILLET3_R, 90, 90)
            Line((0.4 + FILLET3_R, 0), (0.4, 0))
            Line((0.4, 0), (0.4, -FILLET3_R))
        make_face()
    revolve(axis=Axis((24.613348181, 4, -11.2), (0, 0, -1)), revolution_arc=90, mode=Mode.SUBTRACT)
    with BuildSketch(Plane(origin=(24.613348181, 1.8, 0), x_dir=(1, 0, 0), z_dir=(0, 1, 0))) as fillet3_3_piece_9:
        with BuildLine():
            CenterArc((0.4 + FILLET3_R, FILLET3_R), FILLET3_R, 180, 90)
            Line((0.4, FILLET3_R), (0.4, 0))
            Line((0.4, 0), (0.4 + FILLET3_R, 0))
        make_face()
    revolve(axis=Axis((24.613348181, 1.8, 0), (0, 0, -1)), revolution_arc=90, mode=Mode.SUBTRACT)
    with BuildSketch(Plane(origin=(24.613348181, 4, 0), x_dir=(0, 1, 0), z_dir=(-1, 0, 0))) as fillet3_3_piece_10:
        with BuildLine():
            CenterArc((0.4 + FILLET3_R, FILLET3_R), FILLET3_R, 180, 90)
            Line((0.4, FILLET3_R), (0.4, 0))
            Line((0.4, 0), (0.4 + FILLET3_R, 0))
        make_face()
    revolve(axis=Axis((24.613348181, 4, 0), (0, 0, -1)), revolution_arc=90, mode=Mode.SUBTRACT)


solid = part.part
